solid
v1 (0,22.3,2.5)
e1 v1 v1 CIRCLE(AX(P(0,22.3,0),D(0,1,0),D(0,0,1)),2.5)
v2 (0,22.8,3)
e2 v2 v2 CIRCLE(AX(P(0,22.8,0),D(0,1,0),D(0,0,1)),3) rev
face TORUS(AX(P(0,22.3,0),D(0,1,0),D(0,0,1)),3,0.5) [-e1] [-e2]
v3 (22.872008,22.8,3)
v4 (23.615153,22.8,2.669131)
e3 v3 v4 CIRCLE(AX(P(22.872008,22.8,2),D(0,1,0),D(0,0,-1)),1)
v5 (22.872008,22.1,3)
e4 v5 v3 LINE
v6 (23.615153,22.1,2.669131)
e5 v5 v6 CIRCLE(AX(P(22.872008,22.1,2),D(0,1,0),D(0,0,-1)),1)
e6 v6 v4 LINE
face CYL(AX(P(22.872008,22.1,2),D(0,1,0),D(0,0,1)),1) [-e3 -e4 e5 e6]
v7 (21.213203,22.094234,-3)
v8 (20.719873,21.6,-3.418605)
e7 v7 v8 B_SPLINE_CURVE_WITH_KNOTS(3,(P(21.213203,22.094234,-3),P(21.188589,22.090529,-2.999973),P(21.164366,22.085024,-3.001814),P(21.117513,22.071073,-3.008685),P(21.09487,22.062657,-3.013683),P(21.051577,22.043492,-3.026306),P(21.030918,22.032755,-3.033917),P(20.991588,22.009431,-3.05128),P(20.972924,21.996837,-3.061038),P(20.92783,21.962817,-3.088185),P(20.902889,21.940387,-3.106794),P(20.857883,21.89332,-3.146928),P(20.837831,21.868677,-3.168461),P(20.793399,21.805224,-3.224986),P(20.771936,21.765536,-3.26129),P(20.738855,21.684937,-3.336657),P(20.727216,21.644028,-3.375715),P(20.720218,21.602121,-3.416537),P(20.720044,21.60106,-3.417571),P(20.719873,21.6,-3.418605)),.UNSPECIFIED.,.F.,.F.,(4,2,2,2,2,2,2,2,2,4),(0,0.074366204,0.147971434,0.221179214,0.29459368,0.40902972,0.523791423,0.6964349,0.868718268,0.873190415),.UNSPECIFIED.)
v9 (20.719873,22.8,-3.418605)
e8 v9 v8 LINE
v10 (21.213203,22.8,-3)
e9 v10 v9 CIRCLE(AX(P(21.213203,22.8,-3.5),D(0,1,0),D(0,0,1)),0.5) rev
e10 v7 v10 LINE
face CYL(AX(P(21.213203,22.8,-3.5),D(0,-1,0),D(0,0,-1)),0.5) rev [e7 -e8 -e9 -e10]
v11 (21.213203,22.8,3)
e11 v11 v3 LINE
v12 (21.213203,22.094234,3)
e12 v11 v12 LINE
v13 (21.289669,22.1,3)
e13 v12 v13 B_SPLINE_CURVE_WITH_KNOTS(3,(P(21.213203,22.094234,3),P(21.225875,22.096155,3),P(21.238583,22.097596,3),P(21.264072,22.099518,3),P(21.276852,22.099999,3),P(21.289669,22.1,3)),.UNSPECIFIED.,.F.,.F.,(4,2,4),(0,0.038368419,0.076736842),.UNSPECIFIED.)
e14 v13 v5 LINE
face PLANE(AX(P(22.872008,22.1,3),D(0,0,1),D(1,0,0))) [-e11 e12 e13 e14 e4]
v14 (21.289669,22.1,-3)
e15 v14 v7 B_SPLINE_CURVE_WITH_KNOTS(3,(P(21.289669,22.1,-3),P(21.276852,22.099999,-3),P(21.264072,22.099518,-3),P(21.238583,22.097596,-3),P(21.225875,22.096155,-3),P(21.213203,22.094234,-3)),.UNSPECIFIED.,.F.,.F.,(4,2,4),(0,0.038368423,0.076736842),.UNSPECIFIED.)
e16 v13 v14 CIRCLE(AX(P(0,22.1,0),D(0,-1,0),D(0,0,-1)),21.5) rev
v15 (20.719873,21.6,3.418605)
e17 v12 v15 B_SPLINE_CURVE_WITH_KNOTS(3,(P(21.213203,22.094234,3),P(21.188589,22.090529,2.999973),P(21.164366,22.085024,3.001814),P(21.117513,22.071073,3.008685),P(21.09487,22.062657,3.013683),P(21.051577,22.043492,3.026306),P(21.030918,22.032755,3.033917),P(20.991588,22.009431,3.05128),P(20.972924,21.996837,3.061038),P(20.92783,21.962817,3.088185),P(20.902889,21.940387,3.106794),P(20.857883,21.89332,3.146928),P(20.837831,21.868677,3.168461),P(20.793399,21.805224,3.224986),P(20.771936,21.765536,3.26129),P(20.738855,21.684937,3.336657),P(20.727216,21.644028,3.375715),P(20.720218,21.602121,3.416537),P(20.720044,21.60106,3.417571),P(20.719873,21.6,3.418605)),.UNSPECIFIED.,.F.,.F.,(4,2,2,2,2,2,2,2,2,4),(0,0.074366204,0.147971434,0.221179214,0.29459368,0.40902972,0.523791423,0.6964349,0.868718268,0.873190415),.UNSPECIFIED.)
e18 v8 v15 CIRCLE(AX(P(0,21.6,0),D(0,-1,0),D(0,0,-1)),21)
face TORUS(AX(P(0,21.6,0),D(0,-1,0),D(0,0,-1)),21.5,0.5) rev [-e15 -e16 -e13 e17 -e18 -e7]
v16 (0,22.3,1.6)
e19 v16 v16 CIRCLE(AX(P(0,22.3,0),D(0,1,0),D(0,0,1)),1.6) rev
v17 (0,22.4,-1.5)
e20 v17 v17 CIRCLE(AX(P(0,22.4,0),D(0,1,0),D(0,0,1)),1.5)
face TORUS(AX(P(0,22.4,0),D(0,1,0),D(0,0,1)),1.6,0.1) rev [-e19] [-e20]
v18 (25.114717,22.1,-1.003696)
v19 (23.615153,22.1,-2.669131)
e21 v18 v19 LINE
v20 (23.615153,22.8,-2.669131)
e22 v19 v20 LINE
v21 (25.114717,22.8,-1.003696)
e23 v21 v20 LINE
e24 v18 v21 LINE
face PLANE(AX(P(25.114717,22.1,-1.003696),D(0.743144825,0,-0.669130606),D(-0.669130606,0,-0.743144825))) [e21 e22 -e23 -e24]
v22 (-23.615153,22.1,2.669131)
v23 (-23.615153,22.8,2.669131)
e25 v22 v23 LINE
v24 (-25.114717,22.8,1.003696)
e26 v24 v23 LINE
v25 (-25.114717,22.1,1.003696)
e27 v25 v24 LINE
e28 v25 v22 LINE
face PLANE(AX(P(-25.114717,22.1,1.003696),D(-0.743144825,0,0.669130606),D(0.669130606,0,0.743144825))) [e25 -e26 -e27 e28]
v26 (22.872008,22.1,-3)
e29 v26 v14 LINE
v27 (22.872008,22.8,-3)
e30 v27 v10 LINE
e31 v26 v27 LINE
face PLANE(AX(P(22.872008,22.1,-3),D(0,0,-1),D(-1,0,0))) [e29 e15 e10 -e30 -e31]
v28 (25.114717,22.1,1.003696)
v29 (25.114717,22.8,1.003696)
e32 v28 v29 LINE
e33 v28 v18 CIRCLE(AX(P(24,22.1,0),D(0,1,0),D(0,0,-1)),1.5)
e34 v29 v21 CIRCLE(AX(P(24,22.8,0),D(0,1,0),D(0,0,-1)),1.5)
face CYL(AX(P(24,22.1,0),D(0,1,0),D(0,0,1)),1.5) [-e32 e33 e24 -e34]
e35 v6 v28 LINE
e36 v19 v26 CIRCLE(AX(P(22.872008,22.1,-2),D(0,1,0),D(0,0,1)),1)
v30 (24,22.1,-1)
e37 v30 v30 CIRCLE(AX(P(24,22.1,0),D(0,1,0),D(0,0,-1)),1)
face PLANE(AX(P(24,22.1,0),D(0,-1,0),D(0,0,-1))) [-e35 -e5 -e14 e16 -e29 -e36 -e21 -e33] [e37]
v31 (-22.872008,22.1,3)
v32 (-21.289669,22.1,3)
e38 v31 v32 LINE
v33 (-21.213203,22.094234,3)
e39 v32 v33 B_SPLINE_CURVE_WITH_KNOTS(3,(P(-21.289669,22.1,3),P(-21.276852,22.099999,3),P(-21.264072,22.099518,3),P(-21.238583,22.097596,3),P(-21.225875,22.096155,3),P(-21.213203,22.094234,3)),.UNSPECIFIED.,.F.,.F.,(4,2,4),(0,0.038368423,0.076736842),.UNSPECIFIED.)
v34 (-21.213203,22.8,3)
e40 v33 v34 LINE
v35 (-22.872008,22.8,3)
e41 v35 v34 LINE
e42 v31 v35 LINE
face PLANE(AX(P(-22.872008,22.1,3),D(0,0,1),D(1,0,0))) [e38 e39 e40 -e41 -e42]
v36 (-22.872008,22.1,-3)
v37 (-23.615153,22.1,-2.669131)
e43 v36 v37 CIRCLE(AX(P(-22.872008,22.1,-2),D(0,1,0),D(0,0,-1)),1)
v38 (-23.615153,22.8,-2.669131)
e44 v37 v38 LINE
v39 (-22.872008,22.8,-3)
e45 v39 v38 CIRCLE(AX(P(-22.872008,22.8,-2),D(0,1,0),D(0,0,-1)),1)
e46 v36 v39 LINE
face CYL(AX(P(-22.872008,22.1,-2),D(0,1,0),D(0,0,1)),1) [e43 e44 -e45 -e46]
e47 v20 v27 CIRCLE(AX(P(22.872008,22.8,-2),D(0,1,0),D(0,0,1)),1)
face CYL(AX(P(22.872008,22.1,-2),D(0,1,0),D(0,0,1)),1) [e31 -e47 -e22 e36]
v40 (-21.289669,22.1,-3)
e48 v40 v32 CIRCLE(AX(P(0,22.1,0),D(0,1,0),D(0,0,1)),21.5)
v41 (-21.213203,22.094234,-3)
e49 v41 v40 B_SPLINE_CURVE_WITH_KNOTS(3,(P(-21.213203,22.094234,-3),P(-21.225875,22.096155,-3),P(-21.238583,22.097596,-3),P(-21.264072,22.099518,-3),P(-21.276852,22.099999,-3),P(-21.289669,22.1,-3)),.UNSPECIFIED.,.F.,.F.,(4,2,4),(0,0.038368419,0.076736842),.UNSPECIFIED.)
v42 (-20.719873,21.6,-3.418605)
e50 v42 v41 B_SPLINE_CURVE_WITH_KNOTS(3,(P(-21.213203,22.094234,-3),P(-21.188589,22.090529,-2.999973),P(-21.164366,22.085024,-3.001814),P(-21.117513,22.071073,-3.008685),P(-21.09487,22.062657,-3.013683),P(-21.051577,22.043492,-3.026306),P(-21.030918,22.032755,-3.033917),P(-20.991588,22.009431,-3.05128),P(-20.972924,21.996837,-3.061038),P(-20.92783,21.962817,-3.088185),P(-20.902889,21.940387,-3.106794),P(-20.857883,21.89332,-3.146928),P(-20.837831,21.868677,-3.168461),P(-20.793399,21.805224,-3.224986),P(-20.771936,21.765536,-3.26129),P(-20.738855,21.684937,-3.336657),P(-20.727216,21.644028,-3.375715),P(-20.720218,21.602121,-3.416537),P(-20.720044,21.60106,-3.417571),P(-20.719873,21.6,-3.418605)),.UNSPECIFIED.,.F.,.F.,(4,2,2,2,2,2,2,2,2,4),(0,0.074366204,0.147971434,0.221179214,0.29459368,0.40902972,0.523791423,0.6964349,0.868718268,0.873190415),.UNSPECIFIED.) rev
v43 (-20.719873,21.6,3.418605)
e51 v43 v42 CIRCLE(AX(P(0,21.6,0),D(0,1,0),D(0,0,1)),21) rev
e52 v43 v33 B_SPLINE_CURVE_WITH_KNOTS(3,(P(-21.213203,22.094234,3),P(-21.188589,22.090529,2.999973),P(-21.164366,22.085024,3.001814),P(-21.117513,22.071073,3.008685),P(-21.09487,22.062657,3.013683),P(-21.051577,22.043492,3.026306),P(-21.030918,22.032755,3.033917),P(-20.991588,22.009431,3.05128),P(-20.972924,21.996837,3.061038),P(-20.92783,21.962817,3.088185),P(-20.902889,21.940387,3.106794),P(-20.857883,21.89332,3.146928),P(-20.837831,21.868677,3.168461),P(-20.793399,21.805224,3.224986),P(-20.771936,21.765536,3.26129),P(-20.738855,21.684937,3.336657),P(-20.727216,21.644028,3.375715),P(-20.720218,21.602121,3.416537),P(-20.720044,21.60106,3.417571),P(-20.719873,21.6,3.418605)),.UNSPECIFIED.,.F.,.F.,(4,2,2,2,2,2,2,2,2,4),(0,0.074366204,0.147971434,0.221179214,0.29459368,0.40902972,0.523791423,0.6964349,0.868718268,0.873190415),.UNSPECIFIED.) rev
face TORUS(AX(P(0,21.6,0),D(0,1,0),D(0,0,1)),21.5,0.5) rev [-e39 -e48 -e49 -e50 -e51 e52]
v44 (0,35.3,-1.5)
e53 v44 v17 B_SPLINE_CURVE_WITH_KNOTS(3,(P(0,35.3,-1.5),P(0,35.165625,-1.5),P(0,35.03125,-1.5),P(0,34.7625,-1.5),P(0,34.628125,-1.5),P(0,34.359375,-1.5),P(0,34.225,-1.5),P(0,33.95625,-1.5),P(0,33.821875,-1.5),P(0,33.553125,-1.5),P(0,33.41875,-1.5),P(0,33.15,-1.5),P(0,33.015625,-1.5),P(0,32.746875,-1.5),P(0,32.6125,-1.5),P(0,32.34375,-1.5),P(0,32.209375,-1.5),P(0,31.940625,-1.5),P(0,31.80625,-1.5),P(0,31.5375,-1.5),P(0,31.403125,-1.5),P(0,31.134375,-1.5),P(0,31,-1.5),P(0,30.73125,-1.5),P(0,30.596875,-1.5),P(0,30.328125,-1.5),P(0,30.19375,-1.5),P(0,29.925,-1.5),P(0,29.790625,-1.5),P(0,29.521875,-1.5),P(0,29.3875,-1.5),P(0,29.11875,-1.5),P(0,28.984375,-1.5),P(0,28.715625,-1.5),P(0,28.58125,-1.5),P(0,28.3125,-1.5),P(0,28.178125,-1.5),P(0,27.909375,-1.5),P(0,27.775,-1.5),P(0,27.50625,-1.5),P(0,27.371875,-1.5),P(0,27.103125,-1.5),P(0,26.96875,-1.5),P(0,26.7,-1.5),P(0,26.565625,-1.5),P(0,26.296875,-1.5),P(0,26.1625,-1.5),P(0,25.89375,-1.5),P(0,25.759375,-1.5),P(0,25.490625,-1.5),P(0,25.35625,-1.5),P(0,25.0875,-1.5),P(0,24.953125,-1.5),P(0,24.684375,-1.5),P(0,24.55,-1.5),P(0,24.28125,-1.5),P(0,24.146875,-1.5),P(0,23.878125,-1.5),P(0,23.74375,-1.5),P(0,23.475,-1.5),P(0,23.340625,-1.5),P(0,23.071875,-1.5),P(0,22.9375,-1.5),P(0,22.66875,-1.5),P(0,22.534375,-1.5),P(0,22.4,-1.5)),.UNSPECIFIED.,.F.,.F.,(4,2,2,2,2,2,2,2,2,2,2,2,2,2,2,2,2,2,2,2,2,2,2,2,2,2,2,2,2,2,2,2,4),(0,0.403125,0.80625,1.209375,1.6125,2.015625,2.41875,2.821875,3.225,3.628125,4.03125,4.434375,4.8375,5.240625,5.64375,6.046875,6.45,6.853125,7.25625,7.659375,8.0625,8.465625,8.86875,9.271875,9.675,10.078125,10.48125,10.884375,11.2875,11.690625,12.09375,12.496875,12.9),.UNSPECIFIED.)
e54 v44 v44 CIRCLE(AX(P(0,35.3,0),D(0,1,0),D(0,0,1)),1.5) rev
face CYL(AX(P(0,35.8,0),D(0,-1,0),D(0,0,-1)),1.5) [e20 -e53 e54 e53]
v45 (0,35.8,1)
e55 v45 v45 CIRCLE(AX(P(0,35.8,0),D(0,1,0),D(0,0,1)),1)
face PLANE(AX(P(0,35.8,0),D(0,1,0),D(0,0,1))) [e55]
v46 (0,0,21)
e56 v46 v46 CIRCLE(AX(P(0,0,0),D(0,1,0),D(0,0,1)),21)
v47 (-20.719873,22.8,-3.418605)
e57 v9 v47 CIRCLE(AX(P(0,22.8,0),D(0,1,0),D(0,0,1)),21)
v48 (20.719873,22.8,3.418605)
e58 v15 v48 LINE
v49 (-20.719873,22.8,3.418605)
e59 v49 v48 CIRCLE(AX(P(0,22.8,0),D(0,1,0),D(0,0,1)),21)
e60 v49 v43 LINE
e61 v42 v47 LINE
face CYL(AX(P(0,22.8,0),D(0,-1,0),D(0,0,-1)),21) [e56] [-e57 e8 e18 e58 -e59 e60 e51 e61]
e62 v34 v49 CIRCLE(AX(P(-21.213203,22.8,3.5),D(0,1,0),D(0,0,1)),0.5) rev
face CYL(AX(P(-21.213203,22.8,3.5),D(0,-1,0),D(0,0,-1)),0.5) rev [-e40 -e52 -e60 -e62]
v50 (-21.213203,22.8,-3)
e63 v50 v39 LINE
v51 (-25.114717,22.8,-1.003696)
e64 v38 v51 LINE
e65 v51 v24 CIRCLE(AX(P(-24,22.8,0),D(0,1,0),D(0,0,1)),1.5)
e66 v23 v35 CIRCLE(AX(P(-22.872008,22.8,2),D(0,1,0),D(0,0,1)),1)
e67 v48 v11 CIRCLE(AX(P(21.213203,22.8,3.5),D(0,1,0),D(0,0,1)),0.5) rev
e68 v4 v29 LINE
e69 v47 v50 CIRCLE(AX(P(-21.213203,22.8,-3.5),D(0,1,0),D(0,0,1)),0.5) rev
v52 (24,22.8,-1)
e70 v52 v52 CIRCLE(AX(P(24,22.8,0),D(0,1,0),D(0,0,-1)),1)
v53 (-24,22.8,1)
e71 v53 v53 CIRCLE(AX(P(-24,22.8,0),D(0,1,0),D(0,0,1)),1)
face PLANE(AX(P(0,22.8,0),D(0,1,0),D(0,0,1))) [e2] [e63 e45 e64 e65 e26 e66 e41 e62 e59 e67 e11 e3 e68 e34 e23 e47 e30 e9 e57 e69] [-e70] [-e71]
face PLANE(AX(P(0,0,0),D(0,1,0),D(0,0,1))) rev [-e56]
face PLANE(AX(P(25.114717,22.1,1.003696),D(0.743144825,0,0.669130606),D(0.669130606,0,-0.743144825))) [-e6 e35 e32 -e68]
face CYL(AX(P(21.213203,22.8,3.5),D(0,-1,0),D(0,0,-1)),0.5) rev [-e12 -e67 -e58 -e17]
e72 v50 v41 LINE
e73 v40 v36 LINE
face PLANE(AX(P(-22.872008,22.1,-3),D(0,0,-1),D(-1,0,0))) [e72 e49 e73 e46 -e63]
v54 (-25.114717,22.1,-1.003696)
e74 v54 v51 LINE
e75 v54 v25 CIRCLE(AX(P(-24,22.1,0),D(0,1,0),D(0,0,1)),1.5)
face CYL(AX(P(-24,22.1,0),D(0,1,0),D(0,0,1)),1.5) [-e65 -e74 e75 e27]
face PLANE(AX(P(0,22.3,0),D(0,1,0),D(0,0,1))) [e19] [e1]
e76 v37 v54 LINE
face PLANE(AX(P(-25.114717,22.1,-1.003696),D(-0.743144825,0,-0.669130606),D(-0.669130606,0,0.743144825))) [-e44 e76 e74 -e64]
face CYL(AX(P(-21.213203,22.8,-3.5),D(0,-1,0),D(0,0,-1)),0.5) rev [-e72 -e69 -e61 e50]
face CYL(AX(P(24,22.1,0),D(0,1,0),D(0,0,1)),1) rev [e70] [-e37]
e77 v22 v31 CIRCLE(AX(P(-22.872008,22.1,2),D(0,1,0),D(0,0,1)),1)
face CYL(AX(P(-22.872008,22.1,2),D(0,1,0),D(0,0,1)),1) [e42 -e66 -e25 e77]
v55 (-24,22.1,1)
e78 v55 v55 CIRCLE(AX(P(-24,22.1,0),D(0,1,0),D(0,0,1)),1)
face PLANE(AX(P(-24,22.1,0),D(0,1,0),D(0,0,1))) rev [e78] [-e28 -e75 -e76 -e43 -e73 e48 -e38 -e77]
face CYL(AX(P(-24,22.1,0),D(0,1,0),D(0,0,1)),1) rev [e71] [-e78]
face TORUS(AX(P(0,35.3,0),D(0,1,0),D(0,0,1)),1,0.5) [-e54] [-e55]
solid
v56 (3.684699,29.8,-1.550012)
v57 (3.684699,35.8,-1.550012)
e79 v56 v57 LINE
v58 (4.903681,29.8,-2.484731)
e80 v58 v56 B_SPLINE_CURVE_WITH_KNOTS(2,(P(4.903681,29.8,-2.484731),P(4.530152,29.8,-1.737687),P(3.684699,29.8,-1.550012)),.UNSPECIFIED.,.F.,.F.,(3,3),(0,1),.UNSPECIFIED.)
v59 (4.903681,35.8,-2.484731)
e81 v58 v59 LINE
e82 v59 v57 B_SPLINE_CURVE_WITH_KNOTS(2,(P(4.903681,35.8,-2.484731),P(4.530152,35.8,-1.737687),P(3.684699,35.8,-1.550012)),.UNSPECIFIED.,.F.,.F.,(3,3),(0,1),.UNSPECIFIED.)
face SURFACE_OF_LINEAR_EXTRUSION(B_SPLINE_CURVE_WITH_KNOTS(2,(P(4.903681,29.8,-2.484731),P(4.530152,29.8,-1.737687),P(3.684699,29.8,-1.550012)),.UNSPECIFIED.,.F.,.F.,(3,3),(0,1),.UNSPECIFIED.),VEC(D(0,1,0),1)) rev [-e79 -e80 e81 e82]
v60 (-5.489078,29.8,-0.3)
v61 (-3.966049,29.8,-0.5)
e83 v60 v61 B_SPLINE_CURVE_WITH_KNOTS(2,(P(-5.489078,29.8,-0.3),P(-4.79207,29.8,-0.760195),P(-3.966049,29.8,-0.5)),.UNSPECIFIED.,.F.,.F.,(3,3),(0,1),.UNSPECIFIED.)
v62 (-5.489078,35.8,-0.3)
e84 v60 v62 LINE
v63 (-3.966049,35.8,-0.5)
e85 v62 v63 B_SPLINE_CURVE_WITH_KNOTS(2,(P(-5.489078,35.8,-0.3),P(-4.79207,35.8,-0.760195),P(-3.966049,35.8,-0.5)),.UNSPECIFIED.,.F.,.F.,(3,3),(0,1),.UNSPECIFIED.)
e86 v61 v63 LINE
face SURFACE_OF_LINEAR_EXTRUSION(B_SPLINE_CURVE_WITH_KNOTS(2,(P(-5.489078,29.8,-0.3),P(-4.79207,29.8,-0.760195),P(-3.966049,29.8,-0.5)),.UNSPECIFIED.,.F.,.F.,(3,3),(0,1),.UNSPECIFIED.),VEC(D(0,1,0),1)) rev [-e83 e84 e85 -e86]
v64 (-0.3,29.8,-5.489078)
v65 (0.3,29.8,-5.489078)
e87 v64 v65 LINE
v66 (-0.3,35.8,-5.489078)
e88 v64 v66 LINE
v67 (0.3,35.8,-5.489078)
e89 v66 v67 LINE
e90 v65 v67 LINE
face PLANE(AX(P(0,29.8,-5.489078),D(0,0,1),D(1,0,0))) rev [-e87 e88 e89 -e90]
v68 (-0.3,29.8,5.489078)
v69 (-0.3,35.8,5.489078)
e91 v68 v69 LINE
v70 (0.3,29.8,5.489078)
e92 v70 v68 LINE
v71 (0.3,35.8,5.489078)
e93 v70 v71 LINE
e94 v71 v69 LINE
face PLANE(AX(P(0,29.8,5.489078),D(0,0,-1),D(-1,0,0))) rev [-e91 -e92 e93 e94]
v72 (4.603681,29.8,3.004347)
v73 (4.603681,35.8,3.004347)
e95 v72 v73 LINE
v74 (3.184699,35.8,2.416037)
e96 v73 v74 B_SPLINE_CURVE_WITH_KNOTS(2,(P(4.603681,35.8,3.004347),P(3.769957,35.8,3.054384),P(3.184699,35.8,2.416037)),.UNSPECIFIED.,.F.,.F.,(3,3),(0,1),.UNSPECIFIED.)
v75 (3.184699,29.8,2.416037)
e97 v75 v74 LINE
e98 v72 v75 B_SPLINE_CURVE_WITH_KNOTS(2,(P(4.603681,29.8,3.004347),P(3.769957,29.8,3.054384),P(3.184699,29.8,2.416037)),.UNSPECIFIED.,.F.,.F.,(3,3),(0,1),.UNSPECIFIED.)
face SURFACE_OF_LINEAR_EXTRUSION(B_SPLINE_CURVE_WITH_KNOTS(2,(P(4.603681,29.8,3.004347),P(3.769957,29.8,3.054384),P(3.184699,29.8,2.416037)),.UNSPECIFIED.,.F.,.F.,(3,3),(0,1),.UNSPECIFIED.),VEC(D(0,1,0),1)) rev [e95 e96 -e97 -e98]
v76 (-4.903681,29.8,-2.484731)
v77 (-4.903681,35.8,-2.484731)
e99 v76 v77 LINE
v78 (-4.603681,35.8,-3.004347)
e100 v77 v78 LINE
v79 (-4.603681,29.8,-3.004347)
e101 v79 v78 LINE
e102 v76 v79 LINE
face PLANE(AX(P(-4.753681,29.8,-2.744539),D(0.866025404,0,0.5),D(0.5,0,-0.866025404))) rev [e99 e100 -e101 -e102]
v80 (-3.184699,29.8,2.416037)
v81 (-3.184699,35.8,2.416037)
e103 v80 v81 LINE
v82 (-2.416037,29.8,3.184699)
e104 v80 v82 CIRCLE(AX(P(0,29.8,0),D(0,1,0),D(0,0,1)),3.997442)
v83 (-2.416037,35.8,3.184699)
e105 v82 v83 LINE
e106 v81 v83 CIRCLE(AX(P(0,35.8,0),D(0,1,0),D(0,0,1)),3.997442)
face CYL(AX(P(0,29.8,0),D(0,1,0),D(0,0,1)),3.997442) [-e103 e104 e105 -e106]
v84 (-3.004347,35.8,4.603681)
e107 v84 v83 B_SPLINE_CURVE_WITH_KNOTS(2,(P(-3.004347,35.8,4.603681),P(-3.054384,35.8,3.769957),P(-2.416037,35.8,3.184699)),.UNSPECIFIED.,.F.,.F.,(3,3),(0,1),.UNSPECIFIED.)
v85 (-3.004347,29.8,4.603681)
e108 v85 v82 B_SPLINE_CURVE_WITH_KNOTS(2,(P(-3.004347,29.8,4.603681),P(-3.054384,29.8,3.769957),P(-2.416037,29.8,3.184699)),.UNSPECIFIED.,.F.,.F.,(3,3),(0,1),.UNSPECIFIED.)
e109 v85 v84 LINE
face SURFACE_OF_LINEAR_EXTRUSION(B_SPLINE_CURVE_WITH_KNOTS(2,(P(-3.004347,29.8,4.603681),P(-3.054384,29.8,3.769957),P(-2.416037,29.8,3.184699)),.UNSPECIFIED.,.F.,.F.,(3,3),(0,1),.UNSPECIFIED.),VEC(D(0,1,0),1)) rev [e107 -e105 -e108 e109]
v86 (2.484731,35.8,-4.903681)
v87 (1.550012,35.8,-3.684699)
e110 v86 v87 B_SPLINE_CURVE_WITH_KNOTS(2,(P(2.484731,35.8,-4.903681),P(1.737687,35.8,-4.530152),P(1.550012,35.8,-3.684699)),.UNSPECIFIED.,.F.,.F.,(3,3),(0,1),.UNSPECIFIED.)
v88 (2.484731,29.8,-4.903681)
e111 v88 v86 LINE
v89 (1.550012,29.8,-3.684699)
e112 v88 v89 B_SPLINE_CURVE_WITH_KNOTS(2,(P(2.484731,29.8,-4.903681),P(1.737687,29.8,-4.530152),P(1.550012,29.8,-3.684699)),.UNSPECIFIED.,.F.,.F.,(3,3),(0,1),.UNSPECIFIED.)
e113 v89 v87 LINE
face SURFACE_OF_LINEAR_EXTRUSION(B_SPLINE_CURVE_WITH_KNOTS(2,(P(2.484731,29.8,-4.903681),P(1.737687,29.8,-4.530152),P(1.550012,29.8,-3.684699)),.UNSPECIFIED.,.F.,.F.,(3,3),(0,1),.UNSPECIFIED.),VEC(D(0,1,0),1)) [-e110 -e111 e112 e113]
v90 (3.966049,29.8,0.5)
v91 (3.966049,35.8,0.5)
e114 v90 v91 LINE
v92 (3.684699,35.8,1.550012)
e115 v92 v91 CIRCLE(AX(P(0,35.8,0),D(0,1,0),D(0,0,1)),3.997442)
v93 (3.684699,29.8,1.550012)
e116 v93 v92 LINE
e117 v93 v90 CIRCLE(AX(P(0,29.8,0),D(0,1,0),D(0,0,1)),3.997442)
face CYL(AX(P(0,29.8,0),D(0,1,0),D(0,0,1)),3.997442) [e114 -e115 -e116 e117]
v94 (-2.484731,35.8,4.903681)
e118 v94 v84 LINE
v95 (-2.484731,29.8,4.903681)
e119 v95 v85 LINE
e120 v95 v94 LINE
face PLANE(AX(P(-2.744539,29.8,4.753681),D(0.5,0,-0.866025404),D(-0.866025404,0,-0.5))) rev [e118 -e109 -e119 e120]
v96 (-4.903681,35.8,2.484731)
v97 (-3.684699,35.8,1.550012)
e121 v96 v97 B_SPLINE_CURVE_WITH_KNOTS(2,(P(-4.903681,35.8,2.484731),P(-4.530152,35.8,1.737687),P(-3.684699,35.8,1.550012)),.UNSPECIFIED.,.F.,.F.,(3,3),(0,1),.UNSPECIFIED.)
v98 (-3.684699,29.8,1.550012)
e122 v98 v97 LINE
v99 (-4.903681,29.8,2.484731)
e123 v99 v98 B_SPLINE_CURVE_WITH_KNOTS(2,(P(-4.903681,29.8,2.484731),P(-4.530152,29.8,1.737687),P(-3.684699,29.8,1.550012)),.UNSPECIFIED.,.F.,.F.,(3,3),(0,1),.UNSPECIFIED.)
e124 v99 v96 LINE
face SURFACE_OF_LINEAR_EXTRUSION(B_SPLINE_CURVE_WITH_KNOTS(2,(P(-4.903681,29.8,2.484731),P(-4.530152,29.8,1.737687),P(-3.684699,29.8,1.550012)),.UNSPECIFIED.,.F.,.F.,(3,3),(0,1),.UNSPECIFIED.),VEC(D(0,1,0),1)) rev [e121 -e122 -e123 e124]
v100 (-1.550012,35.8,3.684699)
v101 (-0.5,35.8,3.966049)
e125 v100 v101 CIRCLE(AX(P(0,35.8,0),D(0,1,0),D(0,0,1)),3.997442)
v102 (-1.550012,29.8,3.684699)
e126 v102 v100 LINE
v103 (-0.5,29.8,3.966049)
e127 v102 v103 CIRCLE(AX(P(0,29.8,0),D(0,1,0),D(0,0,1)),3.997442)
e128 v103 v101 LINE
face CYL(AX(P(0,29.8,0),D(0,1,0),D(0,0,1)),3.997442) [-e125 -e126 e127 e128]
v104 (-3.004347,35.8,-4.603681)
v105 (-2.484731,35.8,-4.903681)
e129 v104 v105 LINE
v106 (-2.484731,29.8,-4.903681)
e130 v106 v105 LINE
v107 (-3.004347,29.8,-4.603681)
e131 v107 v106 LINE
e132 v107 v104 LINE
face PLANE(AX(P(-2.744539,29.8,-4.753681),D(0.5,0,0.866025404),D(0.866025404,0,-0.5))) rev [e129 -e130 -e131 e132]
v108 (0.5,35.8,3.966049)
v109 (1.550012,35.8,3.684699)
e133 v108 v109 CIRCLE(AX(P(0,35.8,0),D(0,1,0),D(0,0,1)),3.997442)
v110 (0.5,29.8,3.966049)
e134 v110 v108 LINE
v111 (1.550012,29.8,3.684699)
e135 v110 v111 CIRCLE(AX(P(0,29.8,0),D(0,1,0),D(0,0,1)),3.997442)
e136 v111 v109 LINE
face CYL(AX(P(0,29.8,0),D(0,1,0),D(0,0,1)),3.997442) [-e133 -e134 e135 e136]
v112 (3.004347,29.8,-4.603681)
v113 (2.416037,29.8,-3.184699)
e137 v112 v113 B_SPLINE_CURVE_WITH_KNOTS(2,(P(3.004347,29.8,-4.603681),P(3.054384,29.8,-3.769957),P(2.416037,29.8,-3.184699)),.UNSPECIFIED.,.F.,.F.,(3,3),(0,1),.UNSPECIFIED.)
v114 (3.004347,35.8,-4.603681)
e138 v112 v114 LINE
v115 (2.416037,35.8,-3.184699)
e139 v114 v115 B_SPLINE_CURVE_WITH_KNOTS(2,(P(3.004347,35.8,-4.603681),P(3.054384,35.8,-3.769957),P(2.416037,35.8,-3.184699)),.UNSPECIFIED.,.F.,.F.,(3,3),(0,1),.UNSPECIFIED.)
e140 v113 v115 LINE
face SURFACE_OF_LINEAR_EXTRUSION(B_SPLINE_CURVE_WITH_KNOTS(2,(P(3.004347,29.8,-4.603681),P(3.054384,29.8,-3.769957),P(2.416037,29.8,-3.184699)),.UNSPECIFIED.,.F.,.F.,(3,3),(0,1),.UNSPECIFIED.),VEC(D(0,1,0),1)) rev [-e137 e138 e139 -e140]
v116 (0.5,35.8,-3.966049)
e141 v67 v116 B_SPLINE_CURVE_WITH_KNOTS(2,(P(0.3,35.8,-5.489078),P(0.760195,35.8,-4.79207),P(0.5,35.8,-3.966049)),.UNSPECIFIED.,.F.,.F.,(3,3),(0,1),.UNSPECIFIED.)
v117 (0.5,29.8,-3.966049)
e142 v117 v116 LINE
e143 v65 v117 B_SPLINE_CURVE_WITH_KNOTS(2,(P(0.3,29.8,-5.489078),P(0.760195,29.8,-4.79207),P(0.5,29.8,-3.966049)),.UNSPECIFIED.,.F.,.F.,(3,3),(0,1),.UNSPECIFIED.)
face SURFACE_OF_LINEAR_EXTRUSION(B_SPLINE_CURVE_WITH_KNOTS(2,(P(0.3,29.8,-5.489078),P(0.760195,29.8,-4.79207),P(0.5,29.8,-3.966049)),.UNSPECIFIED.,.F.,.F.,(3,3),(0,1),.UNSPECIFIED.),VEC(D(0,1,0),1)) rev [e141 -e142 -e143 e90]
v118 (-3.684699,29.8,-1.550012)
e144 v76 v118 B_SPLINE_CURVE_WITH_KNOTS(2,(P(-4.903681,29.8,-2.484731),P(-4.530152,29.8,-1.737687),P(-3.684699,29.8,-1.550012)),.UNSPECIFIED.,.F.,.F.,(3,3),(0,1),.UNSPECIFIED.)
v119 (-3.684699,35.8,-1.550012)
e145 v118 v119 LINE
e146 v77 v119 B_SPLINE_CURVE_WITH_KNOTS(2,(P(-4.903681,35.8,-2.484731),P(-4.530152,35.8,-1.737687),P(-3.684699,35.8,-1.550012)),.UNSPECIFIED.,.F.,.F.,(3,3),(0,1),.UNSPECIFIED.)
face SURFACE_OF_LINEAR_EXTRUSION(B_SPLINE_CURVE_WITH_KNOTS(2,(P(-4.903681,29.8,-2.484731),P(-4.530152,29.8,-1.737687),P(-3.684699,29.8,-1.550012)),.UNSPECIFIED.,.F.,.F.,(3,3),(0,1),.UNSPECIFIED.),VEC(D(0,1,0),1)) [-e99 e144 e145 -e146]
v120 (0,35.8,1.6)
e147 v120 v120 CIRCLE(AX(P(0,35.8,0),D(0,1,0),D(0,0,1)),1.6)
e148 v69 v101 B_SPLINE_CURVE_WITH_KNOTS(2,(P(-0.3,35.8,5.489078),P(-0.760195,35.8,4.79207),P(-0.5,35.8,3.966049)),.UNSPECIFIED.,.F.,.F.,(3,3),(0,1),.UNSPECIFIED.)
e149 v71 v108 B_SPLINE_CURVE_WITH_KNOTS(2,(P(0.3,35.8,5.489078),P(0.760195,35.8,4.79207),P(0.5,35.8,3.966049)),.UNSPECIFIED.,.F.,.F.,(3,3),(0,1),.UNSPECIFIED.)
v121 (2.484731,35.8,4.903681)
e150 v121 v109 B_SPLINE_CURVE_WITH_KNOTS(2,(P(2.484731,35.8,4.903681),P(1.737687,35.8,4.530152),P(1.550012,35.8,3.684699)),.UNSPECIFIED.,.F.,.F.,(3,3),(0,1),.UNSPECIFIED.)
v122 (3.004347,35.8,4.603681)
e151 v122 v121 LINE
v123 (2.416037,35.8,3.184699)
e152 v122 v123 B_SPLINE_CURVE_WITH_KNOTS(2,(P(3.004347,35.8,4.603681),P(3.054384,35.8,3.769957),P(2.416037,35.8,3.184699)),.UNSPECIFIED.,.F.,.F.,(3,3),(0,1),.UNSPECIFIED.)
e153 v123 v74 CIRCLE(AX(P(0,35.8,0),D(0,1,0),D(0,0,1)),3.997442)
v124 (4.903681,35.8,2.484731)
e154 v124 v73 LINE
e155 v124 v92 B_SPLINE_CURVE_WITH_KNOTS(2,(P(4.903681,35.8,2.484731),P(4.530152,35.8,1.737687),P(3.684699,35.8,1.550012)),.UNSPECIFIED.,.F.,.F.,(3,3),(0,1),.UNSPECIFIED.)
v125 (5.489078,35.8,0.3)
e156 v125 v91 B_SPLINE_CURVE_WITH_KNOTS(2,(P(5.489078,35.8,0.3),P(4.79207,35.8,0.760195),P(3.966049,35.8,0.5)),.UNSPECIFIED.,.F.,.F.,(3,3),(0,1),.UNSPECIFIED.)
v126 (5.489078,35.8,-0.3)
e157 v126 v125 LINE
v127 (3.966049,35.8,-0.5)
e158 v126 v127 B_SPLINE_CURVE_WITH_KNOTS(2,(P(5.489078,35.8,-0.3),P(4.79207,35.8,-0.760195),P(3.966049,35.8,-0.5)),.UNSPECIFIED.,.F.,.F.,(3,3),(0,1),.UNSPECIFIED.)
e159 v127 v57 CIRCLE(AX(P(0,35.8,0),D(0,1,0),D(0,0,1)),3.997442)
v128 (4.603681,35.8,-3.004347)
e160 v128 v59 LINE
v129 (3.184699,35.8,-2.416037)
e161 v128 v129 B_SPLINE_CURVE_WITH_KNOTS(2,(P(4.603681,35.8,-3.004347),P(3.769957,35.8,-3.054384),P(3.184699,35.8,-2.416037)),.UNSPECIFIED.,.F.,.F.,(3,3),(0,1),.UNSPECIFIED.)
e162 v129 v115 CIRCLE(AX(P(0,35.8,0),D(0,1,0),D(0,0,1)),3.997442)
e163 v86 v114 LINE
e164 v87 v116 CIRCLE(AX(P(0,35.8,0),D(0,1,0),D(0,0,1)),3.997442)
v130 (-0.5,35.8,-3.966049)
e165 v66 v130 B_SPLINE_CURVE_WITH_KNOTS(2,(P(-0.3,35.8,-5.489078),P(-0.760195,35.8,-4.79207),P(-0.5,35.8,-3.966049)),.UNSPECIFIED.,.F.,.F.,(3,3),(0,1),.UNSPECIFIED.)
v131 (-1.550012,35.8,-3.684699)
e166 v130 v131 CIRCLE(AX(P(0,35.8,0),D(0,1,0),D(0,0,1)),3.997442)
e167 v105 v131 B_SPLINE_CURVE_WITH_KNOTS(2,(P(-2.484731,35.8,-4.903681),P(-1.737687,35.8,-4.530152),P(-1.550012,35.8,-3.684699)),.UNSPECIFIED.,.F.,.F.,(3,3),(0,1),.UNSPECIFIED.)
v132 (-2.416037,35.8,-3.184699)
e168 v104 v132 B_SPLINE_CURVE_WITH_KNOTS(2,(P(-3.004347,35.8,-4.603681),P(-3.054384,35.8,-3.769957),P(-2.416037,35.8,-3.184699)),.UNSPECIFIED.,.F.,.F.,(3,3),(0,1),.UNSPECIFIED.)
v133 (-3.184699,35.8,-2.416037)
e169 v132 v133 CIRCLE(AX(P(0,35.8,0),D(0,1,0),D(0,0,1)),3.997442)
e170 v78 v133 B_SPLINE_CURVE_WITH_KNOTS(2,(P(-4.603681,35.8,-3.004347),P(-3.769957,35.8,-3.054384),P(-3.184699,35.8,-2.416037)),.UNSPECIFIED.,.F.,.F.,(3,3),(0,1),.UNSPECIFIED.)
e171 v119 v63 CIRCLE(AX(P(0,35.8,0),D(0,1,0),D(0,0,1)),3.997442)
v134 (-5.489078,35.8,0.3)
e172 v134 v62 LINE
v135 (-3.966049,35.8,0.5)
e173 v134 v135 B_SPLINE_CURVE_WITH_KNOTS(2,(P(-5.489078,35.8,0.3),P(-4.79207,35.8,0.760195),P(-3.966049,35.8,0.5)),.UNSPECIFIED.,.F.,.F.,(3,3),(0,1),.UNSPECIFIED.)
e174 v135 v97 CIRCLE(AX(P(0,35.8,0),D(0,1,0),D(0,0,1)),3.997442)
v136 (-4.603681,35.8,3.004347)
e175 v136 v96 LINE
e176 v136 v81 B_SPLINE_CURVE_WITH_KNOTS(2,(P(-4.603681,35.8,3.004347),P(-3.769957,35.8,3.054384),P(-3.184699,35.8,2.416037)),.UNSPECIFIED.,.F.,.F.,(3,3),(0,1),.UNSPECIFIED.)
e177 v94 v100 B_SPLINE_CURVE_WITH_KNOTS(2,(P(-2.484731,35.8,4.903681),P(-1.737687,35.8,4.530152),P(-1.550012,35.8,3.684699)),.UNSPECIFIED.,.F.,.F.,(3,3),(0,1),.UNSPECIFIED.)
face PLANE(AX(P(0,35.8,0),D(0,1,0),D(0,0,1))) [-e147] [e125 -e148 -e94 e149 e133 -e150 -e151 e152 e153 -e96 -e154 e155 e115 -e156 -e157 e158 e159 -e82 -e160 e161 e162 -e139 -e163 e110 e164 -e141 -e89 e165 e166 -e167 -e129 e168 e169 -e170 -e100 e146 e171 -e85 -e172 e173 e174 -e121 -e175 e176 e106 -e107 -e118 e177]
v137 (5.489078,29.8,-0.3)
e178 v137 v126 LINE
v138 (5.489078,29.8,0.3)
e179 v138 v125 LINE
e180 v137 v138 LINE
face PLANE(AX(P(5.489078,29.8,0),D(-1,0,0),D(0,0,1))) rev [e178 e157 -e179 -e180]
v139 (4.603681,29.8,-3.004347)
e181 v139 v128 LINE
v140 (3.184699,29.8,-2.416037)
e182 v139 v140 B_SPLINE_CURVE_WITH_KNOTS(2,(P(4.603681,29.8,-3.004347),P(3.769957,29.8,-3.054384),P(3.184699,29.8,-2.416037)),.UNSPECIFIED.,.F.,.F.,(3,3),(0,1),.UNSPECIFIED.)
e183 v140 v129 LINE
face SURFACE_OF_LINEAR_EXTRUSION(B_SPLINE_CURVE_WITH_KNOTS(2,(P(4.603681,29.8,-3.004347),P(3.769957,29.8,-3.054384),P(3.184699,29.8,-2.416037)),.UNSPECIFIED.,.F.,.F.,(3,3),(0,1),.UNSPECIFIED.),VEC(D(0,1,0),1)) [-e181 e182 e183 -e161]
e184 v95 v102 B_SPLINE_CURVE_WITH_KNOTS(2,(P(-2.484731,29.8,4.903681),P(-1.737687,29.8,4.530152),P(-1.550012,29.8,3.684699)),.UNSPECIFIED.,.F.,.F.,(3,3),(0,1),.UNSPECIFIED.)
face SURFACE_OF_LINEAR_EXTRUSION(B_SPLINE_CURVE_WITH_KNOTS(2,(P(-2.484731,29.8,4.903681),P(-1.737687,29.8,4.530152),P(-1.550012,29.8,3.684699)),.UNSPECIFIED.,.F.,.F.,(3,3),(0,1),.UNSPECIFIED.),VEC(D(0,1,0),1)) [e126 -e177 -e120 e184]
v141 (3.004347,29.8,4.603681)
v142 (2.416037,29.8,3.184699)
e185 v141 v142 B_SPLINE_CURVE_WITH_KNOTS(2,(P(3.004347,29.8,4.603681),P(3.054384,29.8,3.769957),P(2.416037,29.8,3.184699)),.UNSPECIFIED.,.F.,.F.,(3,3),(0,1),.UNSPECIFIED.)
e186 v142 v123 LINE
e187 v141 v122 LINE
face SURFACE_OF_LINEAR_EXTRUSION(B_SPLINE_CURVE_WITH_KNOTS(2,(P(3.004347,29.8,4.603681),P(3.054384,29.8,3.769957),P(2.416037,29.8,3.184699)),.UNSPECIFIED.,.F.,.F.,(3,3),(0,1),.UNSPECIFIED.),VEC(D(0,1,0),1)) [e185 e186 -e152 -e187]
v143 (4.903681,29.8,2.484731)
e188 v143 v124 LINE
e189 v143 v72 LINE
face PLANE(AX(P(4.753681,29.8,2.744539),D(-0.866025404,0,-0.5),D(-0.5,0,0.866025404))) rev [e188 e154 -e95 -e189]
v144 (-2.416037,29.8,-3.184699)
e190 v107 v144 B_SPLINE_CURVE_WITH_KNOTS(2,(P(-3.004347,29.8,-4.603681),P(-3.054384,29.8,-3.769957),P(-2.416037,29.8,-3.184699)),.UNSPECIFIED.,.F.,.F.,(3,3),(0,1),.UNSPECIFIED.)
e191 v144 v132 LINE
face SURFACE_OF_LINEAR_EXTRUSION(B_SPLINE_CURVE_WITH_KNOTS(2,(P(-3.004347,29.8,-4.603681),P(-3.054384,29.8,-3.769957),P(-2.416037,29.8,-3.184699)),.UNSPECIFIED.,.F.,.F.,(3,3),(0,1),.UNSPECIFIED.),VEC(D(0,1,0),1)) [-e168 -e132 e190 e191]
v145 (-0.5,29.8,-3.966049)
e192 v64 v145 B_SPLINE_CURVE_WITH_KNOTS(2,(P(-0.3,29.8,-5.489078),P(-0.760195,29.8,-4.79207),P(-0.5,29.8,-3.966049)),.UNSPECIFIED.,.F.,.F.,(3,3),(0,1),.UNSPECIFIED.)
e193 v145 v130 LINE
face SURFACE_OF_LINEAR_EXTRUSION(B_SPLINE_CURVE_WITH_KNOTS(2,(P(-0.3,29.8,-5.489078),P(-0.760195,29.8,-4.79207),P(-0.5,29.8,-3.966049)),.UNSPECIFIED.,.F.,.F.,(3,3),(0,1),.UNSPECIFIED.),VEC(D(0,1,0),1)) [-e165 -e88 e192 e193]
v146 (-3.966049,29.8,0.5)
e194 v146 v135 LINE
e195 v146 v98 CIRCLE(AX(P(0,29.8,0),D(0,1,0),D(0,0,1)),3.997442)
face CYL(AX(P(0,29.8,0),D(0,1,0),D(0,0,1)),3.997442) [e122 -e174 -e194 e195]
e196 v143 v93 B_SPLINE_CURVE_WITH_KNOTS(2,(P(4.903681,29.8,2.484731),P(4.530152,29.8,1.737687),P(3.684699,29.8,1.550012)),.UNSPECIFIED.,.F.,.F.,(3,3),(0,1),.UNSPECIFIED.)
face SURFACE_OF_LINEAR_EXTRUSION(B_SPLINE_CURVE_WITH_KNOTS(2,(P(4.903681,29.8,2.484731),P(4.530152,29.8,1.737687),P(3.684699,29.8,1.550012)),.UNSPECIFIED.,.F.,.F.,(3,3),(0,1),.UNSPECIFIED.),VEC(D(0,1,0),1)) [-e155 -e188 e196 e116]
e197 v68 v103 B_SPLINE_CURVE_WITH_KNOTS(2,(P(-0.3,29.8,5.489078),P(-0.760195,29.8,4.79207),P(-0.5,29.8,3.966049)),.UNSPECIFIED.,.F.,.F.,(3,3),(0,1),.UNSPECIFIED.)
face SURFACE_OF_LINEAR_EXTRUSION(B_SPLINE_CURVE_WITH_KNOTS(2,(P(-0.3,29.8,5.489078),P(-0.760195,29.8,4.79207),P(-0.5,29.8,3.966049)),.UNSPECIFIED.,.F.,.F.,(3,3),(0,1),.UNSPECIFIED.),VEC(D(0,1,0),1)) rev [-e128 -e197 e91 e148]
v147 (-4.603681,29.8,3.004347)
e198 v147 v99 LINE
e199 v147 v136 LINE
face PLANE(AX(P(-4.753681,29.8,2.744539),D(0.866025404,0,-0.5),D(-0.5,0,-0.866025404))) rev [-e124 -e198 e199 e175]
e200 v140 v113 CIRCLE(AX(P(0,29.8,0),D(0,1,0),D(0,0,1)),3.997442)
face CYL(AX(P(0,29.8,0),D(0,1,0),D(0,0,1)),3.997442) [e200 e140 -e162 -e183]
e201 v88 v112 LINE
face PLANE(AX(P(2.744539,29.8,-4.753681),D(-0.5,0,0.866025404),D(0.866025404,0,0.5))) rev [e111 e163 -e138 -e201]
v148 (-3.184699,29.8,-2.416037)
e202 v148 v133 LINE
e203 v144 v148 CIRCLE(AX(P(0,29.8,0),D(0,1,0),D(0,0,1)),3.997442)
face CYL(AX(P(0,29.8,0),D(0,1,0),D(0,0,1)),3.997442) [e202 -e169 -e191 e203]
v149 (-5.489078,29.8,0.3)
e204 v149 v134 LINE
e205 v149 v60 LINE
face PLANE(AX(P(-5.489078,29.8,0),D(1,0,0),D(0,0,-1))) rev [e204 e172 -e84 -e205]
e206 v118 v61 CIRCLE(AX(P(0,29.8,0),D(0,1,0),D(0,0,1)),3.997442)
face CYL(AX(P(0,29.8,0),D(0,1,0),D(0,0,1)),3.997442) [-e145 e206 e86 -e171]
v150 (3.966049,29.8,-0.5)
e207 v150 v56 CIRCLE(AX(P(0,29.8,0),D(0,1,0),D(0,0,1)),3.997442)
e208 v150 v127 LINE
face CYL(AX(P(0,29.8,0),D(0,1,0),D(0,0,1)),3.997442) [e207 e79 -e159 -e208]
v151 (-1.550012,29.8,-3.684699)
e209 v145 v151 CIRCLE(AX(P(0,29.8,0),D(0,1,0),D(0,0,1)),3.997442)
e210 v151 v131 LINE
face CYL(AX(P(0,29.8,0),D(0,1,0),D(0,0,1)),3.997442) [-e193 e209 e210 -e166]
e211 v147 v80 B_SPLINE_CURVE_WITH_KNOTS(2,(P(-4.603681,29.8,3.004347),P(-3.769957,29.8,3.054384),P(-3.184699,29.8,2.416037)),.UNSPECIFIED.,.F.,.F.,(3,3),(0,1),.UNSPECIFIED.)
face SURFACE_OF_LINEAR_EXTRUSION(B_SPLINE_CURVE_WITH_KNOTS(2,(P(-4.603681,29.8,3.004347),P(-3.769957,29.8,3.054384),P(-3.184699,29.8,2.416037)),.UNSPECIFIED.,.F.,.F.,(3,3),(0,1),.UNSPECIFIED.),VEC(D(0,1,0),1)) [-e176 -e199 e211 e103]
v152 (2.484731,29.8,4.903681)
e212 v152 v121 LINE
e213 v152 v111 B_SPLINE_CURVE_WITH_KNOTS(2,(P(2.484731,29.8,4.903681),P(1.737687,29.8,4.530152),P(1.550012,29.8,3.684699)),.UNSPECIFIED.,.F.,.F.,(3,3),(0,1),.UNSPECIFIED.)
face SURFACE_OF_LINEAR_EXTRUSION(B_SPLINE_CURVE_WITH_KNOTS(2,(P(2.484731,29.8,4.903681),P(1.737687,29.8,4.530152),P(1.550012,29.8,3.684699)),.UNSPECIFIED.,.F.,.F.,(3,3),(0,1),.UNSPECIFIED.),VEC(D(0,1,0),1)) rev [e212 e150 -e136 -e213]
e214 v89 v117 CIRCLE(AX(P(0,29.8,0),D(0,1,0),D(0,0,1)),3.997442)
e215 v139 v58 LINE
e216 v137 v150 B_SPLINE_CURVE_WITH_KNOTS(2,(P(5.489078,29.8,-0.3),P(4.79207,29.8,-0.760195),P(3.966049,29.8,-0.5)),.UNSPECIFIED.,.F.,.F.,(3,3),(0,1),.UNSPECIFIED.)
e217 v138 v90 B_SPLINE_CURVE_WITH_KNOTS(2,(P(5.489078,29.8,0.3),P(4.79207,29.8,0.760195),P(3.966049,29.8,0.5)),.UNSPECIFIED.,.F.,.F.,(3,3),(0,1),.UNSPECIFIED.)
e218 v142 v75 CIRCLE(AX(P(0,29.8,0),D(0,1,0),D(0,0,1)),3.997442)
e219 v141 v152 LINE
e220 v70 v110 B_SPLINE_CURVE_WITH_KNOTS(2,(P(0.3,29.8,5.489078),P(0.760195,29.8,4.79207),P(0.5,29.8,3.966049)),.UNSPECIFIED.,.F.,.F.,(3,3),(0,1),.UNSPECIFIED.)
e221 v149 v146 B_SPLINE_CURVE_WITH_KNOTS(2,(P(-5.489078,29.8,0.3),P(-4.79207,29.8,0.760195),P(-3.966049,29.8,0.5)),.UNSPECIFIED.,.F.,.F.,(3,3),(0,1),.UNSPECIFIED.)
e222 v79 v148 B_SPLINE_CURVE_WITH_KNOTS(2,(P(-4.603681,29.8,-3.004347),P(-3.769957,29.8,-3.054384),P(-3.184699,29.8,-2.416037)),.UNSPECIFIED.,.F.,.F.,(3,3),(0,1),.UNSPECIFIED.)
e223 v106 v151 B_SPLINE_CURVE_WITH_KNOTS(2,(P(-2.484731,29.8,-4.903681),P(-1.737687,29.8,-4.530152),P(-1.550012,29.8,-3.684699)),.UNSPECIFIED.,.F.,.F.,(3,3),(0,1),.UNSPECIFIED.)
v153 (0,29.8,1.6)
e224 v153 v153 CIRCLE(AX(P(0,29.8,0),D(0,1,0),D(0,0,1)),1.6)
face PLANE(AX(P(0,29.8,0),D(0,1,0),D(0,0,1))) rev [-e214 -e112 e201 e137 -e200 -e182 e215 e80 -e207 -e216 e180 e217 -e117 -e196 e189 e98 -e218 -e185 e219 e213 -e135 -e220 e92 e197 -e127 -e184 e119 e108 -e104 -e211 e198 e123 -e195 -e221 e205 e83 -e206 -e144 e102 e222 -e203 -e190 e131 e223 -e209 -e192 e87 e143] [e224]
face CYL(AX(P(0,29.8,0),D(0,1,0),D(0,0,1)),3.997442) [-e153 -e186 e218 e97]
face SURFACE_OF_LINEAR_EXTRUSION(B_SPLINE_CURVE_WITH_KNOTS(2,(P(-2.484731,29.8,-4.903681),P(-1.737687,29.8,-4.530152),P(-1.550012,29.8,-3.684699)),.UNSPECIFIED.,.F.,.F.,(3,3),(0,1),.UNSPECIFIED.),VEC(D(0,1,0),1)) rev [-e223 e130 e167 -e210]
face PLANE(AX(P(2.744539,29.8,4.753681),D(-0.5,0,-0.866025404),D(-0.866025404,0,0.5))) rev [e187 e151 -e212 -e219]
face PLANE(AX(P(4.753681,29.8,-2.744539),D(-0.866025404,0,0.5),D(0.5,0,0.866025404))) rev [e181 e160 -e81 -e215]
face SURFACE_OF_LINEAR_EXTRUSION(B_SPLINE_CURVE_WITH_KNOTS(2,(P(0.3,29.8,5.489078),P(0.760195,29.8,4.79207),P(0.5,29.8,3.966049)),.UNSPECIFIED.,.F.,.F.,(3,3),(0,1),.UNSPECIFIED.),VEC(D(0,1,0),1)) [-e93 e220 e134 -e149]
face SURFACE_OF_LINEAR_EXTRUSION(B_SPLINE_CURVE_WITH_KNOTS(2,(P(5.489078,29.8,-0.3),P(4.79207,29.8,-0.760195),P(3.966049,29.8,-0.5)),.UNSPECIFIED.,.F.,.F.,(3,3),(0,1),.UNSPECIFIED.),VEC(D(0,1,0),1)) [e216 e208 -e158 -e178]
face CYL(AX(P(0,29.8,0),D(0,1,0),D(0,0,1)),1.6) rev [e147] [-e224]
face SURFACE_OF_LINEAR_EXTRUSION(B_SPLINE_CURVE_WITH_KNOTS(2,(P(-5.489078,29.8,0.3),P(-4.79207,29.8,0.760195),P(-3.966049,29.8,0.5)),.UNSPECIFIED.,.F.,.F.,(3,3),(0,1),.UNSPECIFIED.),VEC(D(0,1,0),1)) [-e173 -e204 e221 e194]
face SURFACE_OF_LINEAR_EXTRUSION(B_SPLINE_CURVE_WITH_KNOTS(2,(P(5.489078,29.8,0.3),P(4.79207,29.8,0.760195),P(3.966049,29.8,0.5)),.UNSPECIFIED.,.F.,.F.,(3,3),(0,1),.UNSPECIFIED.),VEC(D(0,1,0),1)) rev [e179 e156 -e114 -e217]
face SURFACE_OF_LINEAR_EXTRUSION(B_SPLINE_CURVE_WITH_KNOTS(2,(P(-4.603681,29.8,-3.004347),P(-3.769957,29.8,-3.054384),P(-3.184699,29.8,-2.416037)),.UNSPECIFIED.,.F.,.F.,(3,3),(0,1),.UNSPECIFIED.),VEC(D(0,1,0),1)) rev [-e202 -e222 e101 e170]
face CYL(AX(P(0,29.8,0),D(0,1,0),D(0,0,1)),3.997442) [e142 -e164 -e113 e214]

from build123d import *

# Parameters (mm, degrees)
SKETCH1_R           = 21
BOSS_EXTRUDE1_DEPTH = 22.8
SKETCH2_R           = 1.5
BOSS_EXTRUDE2_DEPTH = 13
CUT_EXTRUDE1_START  = -0.5
SKETCH3_R           = 2.5
SKETCH3_R_2         = 1.5
CUT_EXTRUDE1_DEPTH  = 0.5
FILLET1_R           = 0.1
FILLET2_R           = 0.5
FILLET3_R           = 0.5
BOSS_EXTRUDE3_START = -0.7
SKETCH4_R           = 1
BOSS_EXTRUDE3_DEPTH = 0.7
FILLET4_R           = 0.5
SKETCH7_R           = 1.6
BOSS_EXTRUDE5_DEPTH = 6


with BuildPart() as part:
    # Sketch1 → Boss-Extrude1 (new body)
    with BuildSketch(Plane(origin=(0, 0, 0), x_dir=(1, 0, 0), z_dir=(0, 1, 0))):
        with Locations(Location((0, 0, 0), (0, 0, 270))):
            Circle(SKETCH1_R)
    extrude(amount=BOSS_EXTRUDE1_DEPTH)

    # Sketch2 → Boss-Extrude2 (add)
    with BuildSketch(Plane(origin=(0, 22.8, 0), x_dir=(1, 0, 0), z_dir=(0, 1, 0))):
        with Locations(Location((0, 0, 0), (0, 0, 90))):
            Circle(SKETCH2_R)
    extrude(amount=BOSS_EXTRUDE2_DEPTH)

    # Sketch3 → Cut-Extrude1 (cut)
    with BuildSketch(Plane(origin=(0, 22.8, 0), x_dir=(1, 0, 0), z_dir=(0, 1, 0)).offset(CUT_EXTRUDE1_START)):
        with Locations(Location((0, 0, 0), (0, 0, 270))):
            Circle(SKETCH3_R)
        with Locations(Location((0, 0, 0), (0, 0, 90))):
            Circle(SKETCH3_R_2, mode=Mode.SUBTRACT)
    extrude(amount=CUT_EXTRUDE1_DEPTH, mode=Mode.SUBTRACT)

    # Fillet1
    fillet1_edges = [part.edges().sort_by_distance(p)[0] for p in [
        (0, 22.3, 1.5),
    ]]
    fillet(fillet1_edges, radius=FILLET1_R)

    # Fillet2
    fillet2_edges = [part.edges().sort_by_distance(p)[0] for p in [
        (0, 22.8, -2.5),
    ]]
    fillet(fillet2_edges, radius=FILLET2_R - 0.0001)  # a hair under: the kernel refuses the full size

    # Fillet3
    fillet3_edges = [part.edges().sort_by_distance(p)[0] for p in [
        (0, 35.8, 1.5),
    ]]
    fillet(fillet3_edges, radius=FILLET3_R)

    # Sketch4 → Boss-Extrude3 (add)
    # profile 1 of 2: a face of its own
    with BuildSketch(Plane(origin=(0, 22.8, 0), x_dir=(1, 0, 0), z_dir=(0, 1, 0)).offset(BOSS_EXTRUDE3_START)):
        with BuildLine():
            Line((-25.114717238, 1.00369591), (-23.615153102, 2.669130606))
            ThreePointArc((-23.615153102, 2.669130606), (-23.278744919, 2.913545458), (-22.872008276, 3))
            Line((-22.872008276, 3), (-20.784609691, 3))
            ThreePointArc((-20.784609691, 3), (-21, 0), (-20.784609691, -3))
            Line((-20.784609691, -3), (-22.872008276, -3))
            ThreePointArc((-22.872008276, -3), (-23.278744919, -2.913545458), (-23.615153102, -2.669130606))
            Line((-23.615153102, -2.669130606), (-25.114717238, -1.00369591))
            ThreePointArc((-25.114717238, -1.00369591), (-25.5, 0), (-25.114717238, 1.00369591))
        make_face()
        with Locations(Location((-24, 0, 0), (0, 0, 270))):
            Circle(SKETCH4_R, mode=Mode.SUBTRACT)
    # profile 2 of 2: a face of its own
    with BuildSketch(Plane(origin=(0, 22.8, 0), x_dir=(1, 0, 0), z_dir=(0, 1, 0)).offset(BOSS_EXTRUDE3_START)):
        with BuildLine():
            Line((25.114717238, -1.00369591), (23.615153102, -2.669130606))
            ThreePointArc((23.615153102, -2.669130606), (23.278744919, -2.913545458), (22.872008276, -3))
            Line((22.872008276, -3), (20.784609691, -3))
            ThreePointArc((20.784609691, -3), (21, 0), (20.784609691, 3))
            Line((20.784609691, 3), (22.872008276, 3))
            ThreePointArc((22.872008276, 3), (23.278744919, 2.913545458), (23.615153102, 2.669130606))
            Line((23.615153102, 2.669130606), (25.114717238, 1.00369591))
            ThreePointArc((25.114717238, 1.00369591), (25.5, 0), (25.114717238, -1.00369591))
        make_face()
        with Locations(Location((24, 0, 0), (0, 0, 90))):
            Circle(SKETCH4_R, mode=Mode.SUBTRACT)
    extrude(amount=BOSS_EXTRUDE3_DEPTH)

    # Fillet4
    fillet4_edges = [part.edges().sort_by_distance(p)[0] for p in [
        (-21, 22.1, 0),
        (-20.784609691, 22.45, -3),
        (-20.784609691, 22.45, 3),
        (21, 22.1, 0),
        (20.784609691, 22.45, 3),
        (20.784609691, 22.45, -3),
    ]]
    fillet(fillet4_edges, radius=FILLET4_R)


with BuildPart() as body_2:
    # Sketch7 → Boss-Extrude5 (new body)
    with BuildSketch(Plane(origin=(0, 35.8, 0), x_dir=(1, 0, 0), z_dir=(0, 1, 0))):
        with BuildLine():
            Line((-0.3, 5.489077784), (0.3, 5.489077784))
            add(Edge.make_bspline(
                [(0.3, 5.489077784), (0.760195198, 4.792070296), (0.5, 3.966048998)],
                knots=[0, 0, 0, 1, 1, 1], degree=2))
            ThreePointArc((0.5, 3.966048998), (1.03461419, 3.861232722), (1.550011797, 3.684699185))
            add(Edge.make_bspline(
                [(2.484731271, 4.903680804), (1.737686795, 4.530152212), (1.550011797, 3.684699185)],
                knots=[0, 0, 0, 1, 1, 1], degree=2))
            Line((2.484731271, 4.903680804), (3.004346513, 4.603680804))
            add(Edge.make_bspline(
                [(3.004346513, 4.603680804), (3.054383501, 3.769957014), (2.416037201, 3.184699185)],
                knots=[0, 0, 0, 1, 1, 1], degree=2))
            ThreePointArc((2.416037201, 3.184699185), (2.826618532, 2.826618532), (3.184699185, 2.416037201))
            add(Edge.make_bspline(
                [(4.603680804, 3.004346513), (3.769957014, 3.054383501), (3.184699185, 2.416037201)],
                knots=[0, 0, 0, 1, 1, 1], degree=2))
            Line((4.603680804, 3.004346513), (4.903680804, 2.484731271))
            add(Edge.make_bspline(
                [(4.903680804, 2.484731271), (4.530152212, 1.737686795), (3.684699185, 1.550011797)],
                knots=[0, 0, 0, 1, 1, 1], degree=2))
            ThreePointArc((3.684699185, 1.550011797), (3.861232722, 1.03461419), (3.966048998, 0.5))
            add(Edge.make_bspline(
                [(5.489077784, 0.3), (4.792070296, 0.760195198), (3.966048998, 0.5)],
                knots=[0, 0, 0, 1, 1, 1], degree=2))
            Line((5.489077784, 0.3), (5.489077784, -0.3))
            add(Edge.make_bspline(
                [(5.489077784, -0.3), (4.792070296, -0.760195198), (3.966048998, -0.5)],
                knots=[0, 0, 0, 1, 1, 1], degree=2))
            ThreePointArc((3.966048998, -0.5), (3.861232722, -1.03461419), (3.684699185, -1.550011797))
            add(Edge.make_bspline(
                [(4.903680804, -2.484731271), (4.530152212, -1.737686795), (3.684699185, -1.550011797)],
                knots=[0, 0, 0, 1, 1, 1], degree=2))
            Line((4.903680804, -2.484731271), (4.603680804, -3.004346513))
            add(Edge.make_bspline(
                [(4.603680804, -3.004346513), (3.769957014, -3.054383501), (3.184699185, -2.416037201)],
                knots=[0, 0, 0, 1, 1, 1], degree=2))
            ThreePointArc((3.184699185, -2.416037201), (2.826618532, -2.826618532), (2.416037201, -3.184699185))
            add(Edge.make_bspline(
                [(3.004346513, -4.603680804), (3.054383501, -3.769957014), (2.416037201, -3.184699185)],
                knots=[0, 0, 0, 1, 1, 1], degree=2))
            Line((3.004346513, -4.603680804), (2.484731271, -4.903680804))
            add(Edge.make_bspline(
                [(2.484731271, -4.903680804), (1.737686795, -4.530152212), (1.550011797, -3.684699185)],
                knots=[0, 0, 0, 1, 1, 1], degree=2))
            ThreePointArc((1.550011797, -3.684699185), (1.03461419, -3.861232722), (0.5, -3.966048998))
            add(Edge.make_bspline(
                [(0.3, -5.489077784), (0.760195198, -4.792070296), (0.5, -3.966048998)],
                knots=[0, 0, 0, 1, 1, 1], degree=2))
            Line((0.3, -5.489077784), (-0.3, -5.489077784))
            add(Edge.make_bspline(
                [(-0.3, -5.489077784), (-0.760195198, -4.792070296), (-0.5, -3.966048998)],
                knots=[0, 0, 0, 1, 1, 1], degree=2))
            ThreePointArc((-0.5, -3.966048998), (-1.03461419, -3.861232722), (-1.550011797, -3.684699185))
            add(Edge.make_bspline(
                [(-2.484731271, -4.903680804), (-1.737686795, -4.530152212), (-1.550011797, -3.684699185)],
                knots=[0, 0, 0, 1, 1, 1], degree=2))
            Line((-2.484731271, -4.903680804), (-3.004346513, -4.603680804))
            add(Edge.make_bspline(
                [(-3.004346513, -4.603680804), (-3.054383501, -3.769957014), (-2.416037201, -3.184699185)],
                knots=[0, 0, 0, 1, 1, 1], degree=2))
            ThreePointArc((-2.416037201, -3.184699185), (-2.826618532, -2.826618532), (-3.184699185, -2.416037201))
            add(Edge.make_bspline(
                [(-4.603680804, -3.004346513), (-3.769957014, -3.054383501), (-3.184699185, -2.416037201)],
                knots=[0, 0, 0, 1, 1, 1], degree=2))
            Line((-4.603680804, -3.004346513), (-4.903680804, -2.484731271))
            add(Edge.make_bspline(
                [(-4.903680804, -2.484731271), (-4.530152212, -1.737686795), (-3.684699185, -1.550011797)],
                knots=[0, 0, 0, 1, 1, 1], degree=2))
            ThreePointArc((-3.684699185, -1.550011797), (-3.861232722, -1.03461419), (-3.966048998, -0.5))
            add(Edge.make_bspline(
                [(-5.489077784, -0.3), (-4.792070296, -0.760195198), (-3.966048998, -0.5)],
                knots=[0, 0, 0, 1, 1, 1], degree=2))
            Line((-5.489077784, -0.3), (-5.489077784, 0.3))
            add(Edge.make_bspline(
                [(-5.489077784, 0.3), (-4.792070296, 0.760195198), (-3.966048998, 0.5)],
                knots=[0, 0, 0, 1, 1, 1], degree=2))
            ThreePointArc((-3.966048998, 0.5), (-3.861232722, 1.03461419), (-3.684699185, 1.550011797))
            add(Edge.make_bspline(
                [(-4.903680804, 2.484731271), (-4.530152212, 1.737686795), (-3.684699185, 1.550011797)],
                knots=[0, 0, 0, 1, 1, 1], degree=2))
            Line((-4.903680804, 2.484731271), (-4.603680804, 3.004346513))
            add(Edge.make_bspline(
                [(-4.603680804, 3.004346513), (-3.769957014, 3.054383501), (-3.184699185, 2.416037201)],
                knots=[0, 0, 0, 1, 1, 1], degree=2))
            ThreePointArc((-3.184699185, 2.416037201), (-2.826618532, 2.826618532), (-2.416037201, 3.184699185))
            add(Edge.make_bspline(
                [(-3.004346513, 4.603680804), (-3.054383501, 3.769957014), (-2.416037201, 3.184699185)],
                knots=[0, 0, 0, 1, 1, 1], degree=2))
            Line((-3.004346513, 4.603680804), (-2.484731271, 4.903680804))
            add(Edge.make_bspline(
                [(-2.484731271, 4.903680804), (-1.737686795, 4.530152212), (-1.550011797, 3.684699185)],
                knots=[0, 0, 0, 1, 1, 1], degree=2))
            ThreePointArc((-1.550011797, 3.684699185), (-1.03461419, 3.861232722), (-0.5, 3.966048998))
            add(Edge.make_bspline(
                [(-0.3, 5.489077784), (-0.760195198, 4.792070296), (-0.5, 3.966048998)],
                knots=[0, 0, 0, 1, 1, 1], degree=2))
        make_face()
        with Locations(Location((0, 0, 0), (0, 0, 270))):
            Circle(SKETCH7_R, mode=Mode.SUBTRACT)
    extrude(amount=-BOSS_EXTRUDE5_DEPTH)


solid = Compound([part.part, body_2.part])
